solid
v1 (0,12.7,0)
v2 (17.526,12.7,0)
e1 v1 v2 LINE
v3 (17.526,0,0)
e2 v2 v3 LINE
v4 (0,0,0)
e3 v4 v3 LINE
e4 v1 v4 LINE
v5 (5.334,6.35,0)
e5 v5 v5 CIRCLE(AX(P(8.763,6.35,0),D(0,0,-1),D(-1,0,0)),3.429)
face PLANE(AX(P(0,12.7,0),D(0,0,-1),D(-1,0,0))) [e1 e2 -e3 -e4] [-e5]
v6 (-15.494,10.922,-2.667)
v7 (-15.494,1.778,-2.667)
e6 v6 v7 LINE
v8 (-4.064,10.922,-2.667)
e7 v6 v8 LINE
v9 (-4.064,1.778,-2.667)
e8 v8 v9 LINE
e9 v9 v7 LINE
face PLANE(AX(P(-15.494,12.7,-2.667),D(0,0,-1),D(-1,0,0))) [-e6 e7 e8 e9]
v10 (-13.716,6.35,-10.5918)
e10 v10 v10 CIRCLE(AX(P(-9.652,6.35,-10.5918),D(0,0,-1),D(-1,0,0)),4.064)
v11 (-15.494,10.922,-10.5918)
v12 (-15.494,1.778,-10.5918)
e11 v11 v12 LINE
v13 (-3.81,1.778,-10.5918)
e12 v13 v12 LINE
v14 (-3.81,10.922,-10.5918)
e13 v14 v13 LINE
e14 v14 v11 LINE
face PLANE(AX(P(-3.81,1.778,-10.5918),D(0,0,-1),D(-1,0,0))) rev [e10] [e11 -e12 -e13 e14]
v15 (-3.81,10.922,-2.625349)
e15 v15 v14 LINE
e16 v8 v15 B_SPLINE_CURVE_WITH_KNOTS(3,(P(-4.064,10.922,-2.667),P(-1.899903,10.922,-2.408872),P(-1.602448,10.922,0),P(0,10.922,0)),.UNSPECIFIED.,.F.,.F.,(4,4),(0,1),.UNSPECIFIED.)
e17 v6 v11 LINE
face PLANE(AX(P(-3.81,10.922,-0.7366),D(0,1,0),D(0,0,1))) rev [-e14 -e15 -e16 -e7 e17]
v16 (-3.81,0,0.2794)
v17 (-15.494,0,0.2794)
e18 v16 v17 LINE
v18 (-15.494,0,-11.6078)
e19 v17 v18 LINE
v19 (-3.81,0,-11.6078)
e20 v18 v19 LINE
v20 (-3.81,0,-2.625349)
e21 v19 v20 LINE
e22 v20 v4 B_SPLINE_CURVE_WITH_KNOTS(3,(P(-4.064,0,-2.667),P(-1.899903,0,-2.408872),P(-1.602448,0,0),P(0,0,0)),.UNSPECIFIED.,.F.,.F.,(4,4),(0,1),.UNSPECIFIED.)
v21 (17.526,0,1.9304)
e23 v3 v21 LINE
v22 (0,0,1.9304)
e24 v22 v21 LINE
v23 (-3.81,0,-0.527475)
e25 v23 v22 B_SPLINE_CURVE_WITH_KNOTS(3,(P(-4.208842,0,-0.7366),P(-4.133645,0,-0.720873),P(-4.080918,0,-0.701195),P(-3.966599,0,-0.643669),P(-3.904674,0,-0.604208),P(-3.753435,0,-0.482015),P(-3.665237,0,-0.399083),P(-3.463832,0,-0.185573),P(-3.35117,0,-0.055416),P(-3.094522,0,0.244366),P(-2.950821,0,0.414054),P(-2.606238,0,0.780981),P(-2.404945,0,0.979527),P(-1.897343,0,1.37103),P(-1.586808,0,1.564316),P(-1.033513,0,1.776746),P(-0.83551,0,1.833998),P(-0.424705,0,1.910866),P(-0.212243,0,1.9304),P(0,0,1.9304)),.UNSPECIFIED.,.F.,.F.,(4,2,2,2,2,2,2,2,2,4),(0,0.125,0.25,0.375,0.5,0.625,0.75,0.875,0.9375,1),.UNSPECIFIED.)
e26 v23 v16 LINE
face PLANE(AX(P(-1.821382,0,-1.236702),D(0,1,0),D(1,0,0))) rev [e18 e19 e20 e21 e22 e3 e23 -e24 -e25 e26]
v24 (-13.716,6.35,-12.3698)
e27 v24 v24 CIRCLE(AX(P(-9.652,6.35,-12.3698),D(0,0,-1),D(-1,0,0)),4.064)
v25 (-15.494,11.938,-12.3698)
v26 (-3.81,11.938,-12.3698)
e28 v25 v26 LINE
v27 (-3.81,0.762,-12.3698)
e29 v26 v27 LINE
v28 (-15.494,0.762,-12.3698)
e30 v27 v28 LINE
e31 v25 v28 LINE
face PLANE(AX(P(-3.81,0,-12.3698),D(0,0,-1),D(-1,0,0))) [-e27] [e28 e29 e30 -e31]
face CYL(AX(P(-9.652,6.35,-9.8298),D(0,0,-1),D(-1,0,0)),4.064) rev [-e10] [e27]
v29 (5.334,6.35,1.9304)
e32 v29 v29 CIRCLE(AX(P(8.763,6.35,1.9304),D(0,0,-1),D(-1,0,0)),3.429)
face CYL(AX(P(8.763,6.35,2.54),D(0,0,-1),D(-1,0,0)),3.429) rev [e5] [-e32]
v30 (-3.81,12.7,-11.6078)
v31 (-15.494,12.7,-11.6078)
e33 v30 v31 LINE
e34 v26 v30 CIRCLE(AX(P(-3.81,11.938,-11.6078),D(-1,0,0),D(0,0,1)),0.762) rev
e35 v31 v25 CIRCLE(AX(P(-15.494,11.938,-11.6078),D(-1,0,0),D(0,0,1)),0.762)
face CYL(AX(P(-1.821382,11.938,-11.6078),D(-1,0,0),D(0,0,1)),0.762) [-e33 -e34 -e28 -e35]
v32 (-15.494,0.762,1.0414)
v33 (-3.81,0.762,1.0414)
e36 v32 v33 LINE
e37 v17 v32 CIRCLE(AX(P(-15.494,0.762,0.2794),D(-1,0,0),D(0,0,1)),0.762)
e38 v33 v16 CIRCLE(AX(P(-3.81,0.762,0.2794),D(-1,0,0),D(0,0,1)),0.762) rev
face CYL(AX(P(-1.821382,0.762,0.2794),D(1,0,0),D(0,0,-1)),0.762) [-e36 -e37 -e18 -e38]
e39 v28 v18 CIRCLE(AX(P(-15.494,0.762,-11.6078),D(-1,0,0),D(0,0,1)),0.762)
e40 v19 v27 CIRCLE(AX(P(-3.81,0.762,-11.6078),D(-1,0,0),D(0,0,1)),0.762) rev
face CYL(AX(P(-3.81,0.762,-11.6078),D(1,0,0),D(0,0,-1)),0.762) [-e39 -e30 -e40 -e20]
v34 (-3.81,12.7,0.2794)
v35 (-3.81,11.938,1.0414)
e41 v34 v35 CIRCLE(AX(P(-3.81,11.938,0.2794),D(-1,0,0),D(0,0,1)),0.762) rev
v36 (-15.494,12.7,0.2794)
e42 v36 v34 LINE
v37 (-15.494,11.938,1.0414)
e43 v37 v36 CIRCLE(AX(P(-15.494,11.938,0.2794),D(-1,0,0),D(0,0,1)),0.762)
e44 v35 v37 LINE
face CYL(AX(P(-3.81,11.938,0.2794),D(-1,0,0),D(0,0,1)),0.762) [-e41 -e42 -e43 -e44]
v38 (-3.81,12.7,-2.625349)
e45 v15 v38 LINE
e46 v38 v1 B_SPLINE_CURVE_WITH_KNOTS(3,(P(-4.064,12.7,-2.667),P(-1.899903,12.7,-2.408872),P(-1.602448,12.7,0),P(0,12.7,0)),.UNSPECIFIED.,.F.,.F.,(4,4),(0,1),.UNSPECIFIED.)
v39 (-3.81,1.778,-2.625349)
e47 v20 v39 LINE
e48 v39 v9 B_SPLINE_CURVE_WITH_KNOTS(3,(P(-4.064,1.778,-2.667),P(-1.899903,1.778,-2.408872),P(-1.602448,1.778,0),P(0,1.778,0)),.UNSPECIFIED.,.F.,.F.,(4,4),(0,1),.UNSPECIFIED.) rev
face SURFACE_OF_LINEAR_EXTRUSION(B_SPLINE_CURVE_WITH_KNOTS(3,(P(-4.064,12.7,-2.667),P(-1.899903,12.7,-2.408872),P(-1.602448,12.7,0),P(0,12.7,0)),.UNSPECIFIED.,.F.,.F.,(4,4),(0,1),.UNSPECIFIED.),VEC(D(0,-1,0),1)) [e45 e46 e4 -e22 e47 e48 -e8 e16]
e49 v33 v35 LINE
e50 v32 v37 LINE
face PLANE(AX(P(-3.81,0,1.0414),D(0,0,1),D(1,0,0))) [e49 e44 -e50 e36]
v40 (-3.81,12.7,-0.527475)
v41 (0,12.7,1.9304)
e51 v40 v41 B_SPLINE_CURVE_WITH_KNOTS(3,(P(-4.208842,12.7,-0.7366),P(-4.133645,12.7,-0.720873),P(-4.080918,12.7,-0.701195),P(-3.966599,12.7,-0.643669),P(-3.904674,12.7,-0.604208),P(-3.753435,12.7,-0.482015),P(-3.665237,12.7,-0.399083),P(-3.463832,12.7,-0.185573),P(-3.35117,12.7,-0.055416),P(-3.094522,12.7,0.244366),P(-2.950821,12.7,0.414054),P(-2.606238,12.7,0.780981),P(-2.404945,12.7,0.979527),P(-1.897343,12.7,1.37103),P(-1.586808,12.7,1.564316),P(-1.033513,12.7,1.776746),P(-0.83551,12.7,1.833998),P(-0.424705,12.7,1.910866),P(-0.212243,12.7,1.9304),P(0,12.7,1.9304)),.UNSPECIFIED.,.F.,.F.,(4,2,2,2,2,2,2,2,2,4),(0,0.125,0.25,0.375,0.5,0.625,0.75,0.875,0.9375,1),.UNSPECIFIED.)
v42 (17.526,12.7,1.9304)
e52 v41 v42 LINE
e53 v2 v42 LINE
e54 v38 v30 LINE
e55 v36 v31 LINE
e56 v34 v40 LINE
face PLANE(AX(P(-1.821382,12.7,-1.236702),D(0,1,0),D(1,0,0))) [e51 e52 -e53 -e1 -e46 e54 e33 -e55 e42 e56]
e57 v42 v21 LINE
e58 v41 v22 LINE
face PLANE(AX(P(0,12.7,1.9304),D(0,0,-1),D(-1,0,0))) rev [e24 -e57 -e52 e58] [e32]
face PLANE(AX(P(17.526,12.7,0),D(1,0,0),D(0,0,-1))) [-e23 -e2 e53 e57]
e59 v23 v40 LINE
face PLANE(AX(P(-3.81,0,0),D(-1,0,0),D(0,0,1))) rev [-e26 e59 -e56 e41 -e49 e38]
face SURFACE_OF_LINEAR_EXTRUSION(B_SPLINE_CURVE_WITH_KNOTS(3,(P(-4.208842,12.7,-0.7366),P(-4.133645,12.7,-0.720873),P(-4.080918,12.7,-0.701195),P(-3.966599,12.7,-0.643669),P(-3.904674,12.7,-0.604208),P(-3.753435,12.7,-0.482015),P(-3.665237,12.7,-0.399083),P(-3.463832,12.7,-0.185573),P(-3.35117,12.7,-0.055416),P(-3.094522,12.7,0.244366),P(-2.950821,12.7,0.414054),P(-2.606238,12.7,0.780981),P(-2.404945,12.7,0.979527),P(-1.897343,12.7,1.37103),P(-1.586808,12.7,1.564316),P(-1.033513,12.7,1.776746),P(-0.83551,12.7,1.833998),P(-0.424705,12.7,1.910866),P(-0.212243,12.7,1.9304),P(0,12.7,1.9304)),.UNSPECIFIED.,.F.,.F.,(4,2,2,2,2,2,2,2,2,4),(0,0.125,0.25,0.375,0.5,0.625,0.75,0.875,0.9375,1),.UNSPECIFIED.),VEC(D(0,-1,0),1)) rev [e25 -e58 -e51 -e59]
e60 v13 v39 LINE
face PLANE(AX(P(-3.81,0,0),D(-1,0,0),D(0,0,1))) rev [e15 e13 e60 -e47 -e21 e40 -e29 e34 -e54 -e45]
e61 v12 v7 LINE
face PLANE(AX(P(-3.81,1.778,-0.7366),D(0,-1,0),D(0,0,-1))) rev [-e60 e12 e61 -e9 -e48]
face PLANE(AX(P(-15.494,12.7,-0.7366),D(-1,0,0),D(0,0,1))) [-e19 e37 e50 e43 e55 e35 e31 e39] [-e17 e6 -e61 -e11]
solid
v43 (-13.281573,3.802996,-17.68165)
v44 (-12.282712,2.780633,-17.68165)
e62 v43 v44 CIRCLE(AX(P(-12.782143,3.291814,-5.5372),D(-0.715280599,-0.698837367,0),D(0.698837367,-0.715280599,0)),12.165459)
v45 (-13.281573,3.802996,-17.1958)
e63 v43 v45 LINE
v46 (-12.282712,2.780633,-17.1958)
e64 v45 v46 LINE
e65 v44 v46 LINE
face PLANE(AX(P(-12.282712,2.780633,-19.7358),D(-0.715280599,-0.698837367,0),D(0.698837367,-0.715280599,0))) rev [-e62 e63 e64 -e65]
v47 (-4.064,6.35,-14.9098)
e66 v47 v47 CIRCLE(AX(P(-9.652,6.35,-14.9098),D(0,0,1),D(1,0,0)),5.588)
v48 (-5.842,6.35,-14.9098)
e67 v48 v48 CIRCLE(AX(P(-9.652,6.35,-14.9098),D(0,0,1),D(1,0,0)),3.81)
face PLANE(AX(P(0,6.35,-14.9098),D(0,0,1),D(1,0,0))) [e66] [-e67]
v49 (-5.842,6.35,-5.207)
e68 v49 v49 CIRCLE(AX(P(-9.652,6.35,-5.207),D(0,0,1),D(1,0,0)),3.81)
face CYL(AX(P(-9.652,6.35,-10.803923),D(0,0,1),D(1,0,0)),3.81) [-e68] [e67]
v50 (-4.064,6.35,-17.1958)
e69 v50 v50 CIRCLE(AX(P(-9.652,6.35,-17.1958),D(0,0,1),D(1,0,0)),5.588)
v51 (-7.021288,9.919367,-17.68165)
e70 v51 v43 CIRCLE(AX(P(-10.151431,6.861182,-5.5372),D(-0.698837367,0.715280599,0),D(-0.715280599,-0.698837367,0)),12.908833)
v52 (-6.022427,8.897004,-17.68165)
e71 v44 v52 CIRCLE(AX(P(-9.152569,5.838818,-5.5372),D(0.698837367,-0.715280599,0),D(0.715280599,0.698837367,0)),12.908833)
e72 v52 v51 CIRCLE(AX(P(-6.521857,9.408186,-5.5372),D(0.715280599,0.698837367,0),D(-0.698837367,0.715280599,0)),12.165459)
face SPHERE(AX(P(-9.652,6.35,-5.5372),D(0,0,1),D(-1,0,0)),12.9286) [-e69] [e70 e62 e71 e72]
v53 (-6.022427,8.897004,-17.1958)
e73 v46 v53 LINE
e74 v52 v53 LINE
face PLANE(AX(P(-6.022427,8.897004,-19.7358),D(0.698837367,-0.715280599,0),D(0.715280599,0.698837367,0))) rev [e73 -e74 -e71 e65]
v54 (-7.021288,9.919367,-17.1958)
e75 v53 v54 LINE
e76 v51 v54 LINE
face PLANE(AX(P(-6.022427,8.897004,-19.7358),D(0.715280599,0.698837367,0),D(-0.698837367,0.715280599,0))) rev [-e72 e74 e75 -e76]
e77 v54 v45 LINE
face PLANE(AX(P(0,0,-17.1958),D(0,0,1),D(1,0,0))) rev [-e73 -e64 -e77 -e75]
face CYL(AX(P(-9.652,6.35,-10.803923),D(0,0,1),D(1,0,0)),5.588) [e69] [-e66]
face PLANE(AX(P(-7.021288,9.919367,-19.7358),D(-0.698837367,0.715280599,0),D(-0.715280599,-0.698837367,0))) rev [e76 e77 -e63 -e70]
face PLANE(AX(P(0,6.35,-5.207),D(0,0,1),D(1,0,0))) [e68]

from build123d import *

# Parameters (mm, degrees)
EXTRUDE_THIN1_DEPTH = 12.7
SKETCH2_R           = 3.429
CUT_EXTRUDE1_DEPTH  = 2.54
SKETCH3_W           = 13.4112
SKETCH3_H           = 12.7
SKETCH3_W_2         = 9.8552
SKETCH3_H_2         = 9.144
BOSS_EXTRUDE1_DEPTH = 11.684
SKETCH4_R           = 4.064
CUT_EXTRUDE2_DEPTH  = 2.54
SKETCH5_W           = 3.81
SKETCH5_H           = 9.7028
CUT_EXTRUDE3_DEPTH  = 2.54
FILLET1_R           = 0.762


# Read off the part's stored shape, not the designer's step: Extrude-Thin1
with BuildPart() as part:
    # Extrude-Thin1 outline → Extrude-Thin1 (new body)
    with BuildSketch(Plane(origin=(0, 0, 0), x_dir=(1, 0, 0), z_dir=(0, 1, 0))):
        with BuildLine():
            Line((0, -1.9304), (17.526, -1.9304))
            Line((17.526, -1.9304), (17.526, 0))
            Line((17.526, 0), (0, 0))
            add(Edge.make_bspline(
                [(-4.064, 2.667), (-1.899902787, 2.408871589), (-1.602448269, 0), (0, 0)],
                knots=[0, 0, 0, 0, 1, 1, 1, 1], degree=3))
            Line((-4.064, 2.667), (-15.494, 2.667))
            Line((-15.494, 2.667), (-15.494, 0.7366))
            Line((-15.494, 0.7366), (-4.20884166, 0.7366))
            add(Edge.make_bspline(
                [(-4.20884166, 0.7366), (-4.133644752, 0.720873402), (-4.080917647, 0.701195252), (-3.96659915, 0.643669048), (-3.90467372, 0.60420831), (-3.753435107, 0.482014662), (-3.665236626, 0.399083494), (-3.463832261, 0.18557347), (-3.351169837, 0.05541551), (-3.094522195, -0.244365971), (-2.950821499, -0.414054001), (-2.606238329, -0.780981081), (-2.404944968, -0.97952681), (-1.897342594, -1.371030345), (-1.586807679, -1.564315851), (-1.033513097, -1.776746241), (-0.835509505, -1.833997779), (-0.424705159, -1.910866197), (-0.212243475, -1.9304), (0, -1.9304)],
                knots=[0, 0, 0, 0, 0.125, 0.125, 0.25, 0.25, 0.375, 0.375, 0.5, 0.5, 0.625, 0.625, 0.75, 0.75, 0.875, 0.875, 0.9375, 0.9375, 1, 1, 1, 1], degree=3))
        make_face()
    extrude(amount=EXTRUDE_THIN1_DEPTH)

    # Sketch2 → Cut-Extrude1 (cut)
    with BuildSketch(Plane(origin=(0, 0, 0), x_dir=(-1, 0, 0), z_dir=(0, 0, -1))):
        with Locations((-8.763, 6.35)):
            Circle(SKETCH2_R)
    extrude(amount=-CUT_EXTRUDE1_DEPTH, mode=Mode.SUBTRACT)

    # Sketch3 → Boss-Extrude1 (add)
    with BuildSketch(Plane.ZY.offset(15.494)):
        with Locations((-5.6642, 6.35)):
            Rectangle(SKETCH3_W, SKETCH3_H)
        with Locations((-5.6642, 6.35)):
            Rectangle(SKETCH3_W_2, SKETCH3_H_2, mode=Mode.SUBTRACT)
    extrude(amount=-BOSS_EXTRUDE1_DEPTH)

    # Sketch4 → Cut-Extrude2 (cut)
    with BuildSketch(Plane(origin=(0, 0, -12.3698), x_dir=(-1, 0, 0), z_dir=(0, 0, -1))):
        with Locations((9.652, 6.35)):
            Circle(SKETCH4_R)
    extrude(amount=-CUT_EXTRUDE2_DEPTH, mode=Mode.SUBTRACT)

    # Fillet1
    fillet1_edges = [part.edges().sort_by_distance(p)[0] for p in [
        (-9.652, 0, 1.0414),
        (-9.652, 12.7, 1.0414),
        (-9.652, 0, -12.3698),
        (-9.652, 12.7, -12.3698),
    ]]
    fillet(fillet1_edges, radius=FILLET1_R)


with BuildPart() as body_2:
    # Sketch5 → Revolve1 (revolve)
    with BuildSketch(Plane(origin=(0, 6.35, 0), x_dir=(-1, 0, 0), z_dir=(0, 1, 0)), mode=Mode.PRIVATE) as revolve1_sk:
        with BuildLine():
            Line((9.652, -18.4658), (9.652, -14.9098))
            Line((9.652, -14.9098), (13.462, -14.9098))
            Line((13.462, -14.9098), (15.24, -14.9098))
            Line((15.24, -14.9098), (15.24, -17.1958))
            ThreePointArc((15.24, -17.1958), (12.5172506, -18.144302639), (9.652, -18.4658))
        make_face()
        with Locations((11.557, -10.0584)):
            Rectangle(SKETCH5_W, SKETCH5_H)
    revolve(revolve1_sk.sketch.rotate(Axis((-9.652, 6.35, -10.803923228), (0, 0, -1)), 180), axis=Axis((-9.652, 6.35, -10.803923228), (0, 0, -1)))

    # Sketch6 → Cut-Extrude3 (cut)
    with BuildSketch(Plane.XY.offset(-17.1958)):
        Polygon((-6.022426526, 8.897003655), (-12.282712271, 2.780632525), (-13.281573474, 3.802996345), (-7.021287729, 9.919367475), align=None)
    extrude(amount=-CUT_EXTRUDE3_DEPTH, mode=Mode.SUBTRACT)


solid = Compound([part.part, body_2.part])
